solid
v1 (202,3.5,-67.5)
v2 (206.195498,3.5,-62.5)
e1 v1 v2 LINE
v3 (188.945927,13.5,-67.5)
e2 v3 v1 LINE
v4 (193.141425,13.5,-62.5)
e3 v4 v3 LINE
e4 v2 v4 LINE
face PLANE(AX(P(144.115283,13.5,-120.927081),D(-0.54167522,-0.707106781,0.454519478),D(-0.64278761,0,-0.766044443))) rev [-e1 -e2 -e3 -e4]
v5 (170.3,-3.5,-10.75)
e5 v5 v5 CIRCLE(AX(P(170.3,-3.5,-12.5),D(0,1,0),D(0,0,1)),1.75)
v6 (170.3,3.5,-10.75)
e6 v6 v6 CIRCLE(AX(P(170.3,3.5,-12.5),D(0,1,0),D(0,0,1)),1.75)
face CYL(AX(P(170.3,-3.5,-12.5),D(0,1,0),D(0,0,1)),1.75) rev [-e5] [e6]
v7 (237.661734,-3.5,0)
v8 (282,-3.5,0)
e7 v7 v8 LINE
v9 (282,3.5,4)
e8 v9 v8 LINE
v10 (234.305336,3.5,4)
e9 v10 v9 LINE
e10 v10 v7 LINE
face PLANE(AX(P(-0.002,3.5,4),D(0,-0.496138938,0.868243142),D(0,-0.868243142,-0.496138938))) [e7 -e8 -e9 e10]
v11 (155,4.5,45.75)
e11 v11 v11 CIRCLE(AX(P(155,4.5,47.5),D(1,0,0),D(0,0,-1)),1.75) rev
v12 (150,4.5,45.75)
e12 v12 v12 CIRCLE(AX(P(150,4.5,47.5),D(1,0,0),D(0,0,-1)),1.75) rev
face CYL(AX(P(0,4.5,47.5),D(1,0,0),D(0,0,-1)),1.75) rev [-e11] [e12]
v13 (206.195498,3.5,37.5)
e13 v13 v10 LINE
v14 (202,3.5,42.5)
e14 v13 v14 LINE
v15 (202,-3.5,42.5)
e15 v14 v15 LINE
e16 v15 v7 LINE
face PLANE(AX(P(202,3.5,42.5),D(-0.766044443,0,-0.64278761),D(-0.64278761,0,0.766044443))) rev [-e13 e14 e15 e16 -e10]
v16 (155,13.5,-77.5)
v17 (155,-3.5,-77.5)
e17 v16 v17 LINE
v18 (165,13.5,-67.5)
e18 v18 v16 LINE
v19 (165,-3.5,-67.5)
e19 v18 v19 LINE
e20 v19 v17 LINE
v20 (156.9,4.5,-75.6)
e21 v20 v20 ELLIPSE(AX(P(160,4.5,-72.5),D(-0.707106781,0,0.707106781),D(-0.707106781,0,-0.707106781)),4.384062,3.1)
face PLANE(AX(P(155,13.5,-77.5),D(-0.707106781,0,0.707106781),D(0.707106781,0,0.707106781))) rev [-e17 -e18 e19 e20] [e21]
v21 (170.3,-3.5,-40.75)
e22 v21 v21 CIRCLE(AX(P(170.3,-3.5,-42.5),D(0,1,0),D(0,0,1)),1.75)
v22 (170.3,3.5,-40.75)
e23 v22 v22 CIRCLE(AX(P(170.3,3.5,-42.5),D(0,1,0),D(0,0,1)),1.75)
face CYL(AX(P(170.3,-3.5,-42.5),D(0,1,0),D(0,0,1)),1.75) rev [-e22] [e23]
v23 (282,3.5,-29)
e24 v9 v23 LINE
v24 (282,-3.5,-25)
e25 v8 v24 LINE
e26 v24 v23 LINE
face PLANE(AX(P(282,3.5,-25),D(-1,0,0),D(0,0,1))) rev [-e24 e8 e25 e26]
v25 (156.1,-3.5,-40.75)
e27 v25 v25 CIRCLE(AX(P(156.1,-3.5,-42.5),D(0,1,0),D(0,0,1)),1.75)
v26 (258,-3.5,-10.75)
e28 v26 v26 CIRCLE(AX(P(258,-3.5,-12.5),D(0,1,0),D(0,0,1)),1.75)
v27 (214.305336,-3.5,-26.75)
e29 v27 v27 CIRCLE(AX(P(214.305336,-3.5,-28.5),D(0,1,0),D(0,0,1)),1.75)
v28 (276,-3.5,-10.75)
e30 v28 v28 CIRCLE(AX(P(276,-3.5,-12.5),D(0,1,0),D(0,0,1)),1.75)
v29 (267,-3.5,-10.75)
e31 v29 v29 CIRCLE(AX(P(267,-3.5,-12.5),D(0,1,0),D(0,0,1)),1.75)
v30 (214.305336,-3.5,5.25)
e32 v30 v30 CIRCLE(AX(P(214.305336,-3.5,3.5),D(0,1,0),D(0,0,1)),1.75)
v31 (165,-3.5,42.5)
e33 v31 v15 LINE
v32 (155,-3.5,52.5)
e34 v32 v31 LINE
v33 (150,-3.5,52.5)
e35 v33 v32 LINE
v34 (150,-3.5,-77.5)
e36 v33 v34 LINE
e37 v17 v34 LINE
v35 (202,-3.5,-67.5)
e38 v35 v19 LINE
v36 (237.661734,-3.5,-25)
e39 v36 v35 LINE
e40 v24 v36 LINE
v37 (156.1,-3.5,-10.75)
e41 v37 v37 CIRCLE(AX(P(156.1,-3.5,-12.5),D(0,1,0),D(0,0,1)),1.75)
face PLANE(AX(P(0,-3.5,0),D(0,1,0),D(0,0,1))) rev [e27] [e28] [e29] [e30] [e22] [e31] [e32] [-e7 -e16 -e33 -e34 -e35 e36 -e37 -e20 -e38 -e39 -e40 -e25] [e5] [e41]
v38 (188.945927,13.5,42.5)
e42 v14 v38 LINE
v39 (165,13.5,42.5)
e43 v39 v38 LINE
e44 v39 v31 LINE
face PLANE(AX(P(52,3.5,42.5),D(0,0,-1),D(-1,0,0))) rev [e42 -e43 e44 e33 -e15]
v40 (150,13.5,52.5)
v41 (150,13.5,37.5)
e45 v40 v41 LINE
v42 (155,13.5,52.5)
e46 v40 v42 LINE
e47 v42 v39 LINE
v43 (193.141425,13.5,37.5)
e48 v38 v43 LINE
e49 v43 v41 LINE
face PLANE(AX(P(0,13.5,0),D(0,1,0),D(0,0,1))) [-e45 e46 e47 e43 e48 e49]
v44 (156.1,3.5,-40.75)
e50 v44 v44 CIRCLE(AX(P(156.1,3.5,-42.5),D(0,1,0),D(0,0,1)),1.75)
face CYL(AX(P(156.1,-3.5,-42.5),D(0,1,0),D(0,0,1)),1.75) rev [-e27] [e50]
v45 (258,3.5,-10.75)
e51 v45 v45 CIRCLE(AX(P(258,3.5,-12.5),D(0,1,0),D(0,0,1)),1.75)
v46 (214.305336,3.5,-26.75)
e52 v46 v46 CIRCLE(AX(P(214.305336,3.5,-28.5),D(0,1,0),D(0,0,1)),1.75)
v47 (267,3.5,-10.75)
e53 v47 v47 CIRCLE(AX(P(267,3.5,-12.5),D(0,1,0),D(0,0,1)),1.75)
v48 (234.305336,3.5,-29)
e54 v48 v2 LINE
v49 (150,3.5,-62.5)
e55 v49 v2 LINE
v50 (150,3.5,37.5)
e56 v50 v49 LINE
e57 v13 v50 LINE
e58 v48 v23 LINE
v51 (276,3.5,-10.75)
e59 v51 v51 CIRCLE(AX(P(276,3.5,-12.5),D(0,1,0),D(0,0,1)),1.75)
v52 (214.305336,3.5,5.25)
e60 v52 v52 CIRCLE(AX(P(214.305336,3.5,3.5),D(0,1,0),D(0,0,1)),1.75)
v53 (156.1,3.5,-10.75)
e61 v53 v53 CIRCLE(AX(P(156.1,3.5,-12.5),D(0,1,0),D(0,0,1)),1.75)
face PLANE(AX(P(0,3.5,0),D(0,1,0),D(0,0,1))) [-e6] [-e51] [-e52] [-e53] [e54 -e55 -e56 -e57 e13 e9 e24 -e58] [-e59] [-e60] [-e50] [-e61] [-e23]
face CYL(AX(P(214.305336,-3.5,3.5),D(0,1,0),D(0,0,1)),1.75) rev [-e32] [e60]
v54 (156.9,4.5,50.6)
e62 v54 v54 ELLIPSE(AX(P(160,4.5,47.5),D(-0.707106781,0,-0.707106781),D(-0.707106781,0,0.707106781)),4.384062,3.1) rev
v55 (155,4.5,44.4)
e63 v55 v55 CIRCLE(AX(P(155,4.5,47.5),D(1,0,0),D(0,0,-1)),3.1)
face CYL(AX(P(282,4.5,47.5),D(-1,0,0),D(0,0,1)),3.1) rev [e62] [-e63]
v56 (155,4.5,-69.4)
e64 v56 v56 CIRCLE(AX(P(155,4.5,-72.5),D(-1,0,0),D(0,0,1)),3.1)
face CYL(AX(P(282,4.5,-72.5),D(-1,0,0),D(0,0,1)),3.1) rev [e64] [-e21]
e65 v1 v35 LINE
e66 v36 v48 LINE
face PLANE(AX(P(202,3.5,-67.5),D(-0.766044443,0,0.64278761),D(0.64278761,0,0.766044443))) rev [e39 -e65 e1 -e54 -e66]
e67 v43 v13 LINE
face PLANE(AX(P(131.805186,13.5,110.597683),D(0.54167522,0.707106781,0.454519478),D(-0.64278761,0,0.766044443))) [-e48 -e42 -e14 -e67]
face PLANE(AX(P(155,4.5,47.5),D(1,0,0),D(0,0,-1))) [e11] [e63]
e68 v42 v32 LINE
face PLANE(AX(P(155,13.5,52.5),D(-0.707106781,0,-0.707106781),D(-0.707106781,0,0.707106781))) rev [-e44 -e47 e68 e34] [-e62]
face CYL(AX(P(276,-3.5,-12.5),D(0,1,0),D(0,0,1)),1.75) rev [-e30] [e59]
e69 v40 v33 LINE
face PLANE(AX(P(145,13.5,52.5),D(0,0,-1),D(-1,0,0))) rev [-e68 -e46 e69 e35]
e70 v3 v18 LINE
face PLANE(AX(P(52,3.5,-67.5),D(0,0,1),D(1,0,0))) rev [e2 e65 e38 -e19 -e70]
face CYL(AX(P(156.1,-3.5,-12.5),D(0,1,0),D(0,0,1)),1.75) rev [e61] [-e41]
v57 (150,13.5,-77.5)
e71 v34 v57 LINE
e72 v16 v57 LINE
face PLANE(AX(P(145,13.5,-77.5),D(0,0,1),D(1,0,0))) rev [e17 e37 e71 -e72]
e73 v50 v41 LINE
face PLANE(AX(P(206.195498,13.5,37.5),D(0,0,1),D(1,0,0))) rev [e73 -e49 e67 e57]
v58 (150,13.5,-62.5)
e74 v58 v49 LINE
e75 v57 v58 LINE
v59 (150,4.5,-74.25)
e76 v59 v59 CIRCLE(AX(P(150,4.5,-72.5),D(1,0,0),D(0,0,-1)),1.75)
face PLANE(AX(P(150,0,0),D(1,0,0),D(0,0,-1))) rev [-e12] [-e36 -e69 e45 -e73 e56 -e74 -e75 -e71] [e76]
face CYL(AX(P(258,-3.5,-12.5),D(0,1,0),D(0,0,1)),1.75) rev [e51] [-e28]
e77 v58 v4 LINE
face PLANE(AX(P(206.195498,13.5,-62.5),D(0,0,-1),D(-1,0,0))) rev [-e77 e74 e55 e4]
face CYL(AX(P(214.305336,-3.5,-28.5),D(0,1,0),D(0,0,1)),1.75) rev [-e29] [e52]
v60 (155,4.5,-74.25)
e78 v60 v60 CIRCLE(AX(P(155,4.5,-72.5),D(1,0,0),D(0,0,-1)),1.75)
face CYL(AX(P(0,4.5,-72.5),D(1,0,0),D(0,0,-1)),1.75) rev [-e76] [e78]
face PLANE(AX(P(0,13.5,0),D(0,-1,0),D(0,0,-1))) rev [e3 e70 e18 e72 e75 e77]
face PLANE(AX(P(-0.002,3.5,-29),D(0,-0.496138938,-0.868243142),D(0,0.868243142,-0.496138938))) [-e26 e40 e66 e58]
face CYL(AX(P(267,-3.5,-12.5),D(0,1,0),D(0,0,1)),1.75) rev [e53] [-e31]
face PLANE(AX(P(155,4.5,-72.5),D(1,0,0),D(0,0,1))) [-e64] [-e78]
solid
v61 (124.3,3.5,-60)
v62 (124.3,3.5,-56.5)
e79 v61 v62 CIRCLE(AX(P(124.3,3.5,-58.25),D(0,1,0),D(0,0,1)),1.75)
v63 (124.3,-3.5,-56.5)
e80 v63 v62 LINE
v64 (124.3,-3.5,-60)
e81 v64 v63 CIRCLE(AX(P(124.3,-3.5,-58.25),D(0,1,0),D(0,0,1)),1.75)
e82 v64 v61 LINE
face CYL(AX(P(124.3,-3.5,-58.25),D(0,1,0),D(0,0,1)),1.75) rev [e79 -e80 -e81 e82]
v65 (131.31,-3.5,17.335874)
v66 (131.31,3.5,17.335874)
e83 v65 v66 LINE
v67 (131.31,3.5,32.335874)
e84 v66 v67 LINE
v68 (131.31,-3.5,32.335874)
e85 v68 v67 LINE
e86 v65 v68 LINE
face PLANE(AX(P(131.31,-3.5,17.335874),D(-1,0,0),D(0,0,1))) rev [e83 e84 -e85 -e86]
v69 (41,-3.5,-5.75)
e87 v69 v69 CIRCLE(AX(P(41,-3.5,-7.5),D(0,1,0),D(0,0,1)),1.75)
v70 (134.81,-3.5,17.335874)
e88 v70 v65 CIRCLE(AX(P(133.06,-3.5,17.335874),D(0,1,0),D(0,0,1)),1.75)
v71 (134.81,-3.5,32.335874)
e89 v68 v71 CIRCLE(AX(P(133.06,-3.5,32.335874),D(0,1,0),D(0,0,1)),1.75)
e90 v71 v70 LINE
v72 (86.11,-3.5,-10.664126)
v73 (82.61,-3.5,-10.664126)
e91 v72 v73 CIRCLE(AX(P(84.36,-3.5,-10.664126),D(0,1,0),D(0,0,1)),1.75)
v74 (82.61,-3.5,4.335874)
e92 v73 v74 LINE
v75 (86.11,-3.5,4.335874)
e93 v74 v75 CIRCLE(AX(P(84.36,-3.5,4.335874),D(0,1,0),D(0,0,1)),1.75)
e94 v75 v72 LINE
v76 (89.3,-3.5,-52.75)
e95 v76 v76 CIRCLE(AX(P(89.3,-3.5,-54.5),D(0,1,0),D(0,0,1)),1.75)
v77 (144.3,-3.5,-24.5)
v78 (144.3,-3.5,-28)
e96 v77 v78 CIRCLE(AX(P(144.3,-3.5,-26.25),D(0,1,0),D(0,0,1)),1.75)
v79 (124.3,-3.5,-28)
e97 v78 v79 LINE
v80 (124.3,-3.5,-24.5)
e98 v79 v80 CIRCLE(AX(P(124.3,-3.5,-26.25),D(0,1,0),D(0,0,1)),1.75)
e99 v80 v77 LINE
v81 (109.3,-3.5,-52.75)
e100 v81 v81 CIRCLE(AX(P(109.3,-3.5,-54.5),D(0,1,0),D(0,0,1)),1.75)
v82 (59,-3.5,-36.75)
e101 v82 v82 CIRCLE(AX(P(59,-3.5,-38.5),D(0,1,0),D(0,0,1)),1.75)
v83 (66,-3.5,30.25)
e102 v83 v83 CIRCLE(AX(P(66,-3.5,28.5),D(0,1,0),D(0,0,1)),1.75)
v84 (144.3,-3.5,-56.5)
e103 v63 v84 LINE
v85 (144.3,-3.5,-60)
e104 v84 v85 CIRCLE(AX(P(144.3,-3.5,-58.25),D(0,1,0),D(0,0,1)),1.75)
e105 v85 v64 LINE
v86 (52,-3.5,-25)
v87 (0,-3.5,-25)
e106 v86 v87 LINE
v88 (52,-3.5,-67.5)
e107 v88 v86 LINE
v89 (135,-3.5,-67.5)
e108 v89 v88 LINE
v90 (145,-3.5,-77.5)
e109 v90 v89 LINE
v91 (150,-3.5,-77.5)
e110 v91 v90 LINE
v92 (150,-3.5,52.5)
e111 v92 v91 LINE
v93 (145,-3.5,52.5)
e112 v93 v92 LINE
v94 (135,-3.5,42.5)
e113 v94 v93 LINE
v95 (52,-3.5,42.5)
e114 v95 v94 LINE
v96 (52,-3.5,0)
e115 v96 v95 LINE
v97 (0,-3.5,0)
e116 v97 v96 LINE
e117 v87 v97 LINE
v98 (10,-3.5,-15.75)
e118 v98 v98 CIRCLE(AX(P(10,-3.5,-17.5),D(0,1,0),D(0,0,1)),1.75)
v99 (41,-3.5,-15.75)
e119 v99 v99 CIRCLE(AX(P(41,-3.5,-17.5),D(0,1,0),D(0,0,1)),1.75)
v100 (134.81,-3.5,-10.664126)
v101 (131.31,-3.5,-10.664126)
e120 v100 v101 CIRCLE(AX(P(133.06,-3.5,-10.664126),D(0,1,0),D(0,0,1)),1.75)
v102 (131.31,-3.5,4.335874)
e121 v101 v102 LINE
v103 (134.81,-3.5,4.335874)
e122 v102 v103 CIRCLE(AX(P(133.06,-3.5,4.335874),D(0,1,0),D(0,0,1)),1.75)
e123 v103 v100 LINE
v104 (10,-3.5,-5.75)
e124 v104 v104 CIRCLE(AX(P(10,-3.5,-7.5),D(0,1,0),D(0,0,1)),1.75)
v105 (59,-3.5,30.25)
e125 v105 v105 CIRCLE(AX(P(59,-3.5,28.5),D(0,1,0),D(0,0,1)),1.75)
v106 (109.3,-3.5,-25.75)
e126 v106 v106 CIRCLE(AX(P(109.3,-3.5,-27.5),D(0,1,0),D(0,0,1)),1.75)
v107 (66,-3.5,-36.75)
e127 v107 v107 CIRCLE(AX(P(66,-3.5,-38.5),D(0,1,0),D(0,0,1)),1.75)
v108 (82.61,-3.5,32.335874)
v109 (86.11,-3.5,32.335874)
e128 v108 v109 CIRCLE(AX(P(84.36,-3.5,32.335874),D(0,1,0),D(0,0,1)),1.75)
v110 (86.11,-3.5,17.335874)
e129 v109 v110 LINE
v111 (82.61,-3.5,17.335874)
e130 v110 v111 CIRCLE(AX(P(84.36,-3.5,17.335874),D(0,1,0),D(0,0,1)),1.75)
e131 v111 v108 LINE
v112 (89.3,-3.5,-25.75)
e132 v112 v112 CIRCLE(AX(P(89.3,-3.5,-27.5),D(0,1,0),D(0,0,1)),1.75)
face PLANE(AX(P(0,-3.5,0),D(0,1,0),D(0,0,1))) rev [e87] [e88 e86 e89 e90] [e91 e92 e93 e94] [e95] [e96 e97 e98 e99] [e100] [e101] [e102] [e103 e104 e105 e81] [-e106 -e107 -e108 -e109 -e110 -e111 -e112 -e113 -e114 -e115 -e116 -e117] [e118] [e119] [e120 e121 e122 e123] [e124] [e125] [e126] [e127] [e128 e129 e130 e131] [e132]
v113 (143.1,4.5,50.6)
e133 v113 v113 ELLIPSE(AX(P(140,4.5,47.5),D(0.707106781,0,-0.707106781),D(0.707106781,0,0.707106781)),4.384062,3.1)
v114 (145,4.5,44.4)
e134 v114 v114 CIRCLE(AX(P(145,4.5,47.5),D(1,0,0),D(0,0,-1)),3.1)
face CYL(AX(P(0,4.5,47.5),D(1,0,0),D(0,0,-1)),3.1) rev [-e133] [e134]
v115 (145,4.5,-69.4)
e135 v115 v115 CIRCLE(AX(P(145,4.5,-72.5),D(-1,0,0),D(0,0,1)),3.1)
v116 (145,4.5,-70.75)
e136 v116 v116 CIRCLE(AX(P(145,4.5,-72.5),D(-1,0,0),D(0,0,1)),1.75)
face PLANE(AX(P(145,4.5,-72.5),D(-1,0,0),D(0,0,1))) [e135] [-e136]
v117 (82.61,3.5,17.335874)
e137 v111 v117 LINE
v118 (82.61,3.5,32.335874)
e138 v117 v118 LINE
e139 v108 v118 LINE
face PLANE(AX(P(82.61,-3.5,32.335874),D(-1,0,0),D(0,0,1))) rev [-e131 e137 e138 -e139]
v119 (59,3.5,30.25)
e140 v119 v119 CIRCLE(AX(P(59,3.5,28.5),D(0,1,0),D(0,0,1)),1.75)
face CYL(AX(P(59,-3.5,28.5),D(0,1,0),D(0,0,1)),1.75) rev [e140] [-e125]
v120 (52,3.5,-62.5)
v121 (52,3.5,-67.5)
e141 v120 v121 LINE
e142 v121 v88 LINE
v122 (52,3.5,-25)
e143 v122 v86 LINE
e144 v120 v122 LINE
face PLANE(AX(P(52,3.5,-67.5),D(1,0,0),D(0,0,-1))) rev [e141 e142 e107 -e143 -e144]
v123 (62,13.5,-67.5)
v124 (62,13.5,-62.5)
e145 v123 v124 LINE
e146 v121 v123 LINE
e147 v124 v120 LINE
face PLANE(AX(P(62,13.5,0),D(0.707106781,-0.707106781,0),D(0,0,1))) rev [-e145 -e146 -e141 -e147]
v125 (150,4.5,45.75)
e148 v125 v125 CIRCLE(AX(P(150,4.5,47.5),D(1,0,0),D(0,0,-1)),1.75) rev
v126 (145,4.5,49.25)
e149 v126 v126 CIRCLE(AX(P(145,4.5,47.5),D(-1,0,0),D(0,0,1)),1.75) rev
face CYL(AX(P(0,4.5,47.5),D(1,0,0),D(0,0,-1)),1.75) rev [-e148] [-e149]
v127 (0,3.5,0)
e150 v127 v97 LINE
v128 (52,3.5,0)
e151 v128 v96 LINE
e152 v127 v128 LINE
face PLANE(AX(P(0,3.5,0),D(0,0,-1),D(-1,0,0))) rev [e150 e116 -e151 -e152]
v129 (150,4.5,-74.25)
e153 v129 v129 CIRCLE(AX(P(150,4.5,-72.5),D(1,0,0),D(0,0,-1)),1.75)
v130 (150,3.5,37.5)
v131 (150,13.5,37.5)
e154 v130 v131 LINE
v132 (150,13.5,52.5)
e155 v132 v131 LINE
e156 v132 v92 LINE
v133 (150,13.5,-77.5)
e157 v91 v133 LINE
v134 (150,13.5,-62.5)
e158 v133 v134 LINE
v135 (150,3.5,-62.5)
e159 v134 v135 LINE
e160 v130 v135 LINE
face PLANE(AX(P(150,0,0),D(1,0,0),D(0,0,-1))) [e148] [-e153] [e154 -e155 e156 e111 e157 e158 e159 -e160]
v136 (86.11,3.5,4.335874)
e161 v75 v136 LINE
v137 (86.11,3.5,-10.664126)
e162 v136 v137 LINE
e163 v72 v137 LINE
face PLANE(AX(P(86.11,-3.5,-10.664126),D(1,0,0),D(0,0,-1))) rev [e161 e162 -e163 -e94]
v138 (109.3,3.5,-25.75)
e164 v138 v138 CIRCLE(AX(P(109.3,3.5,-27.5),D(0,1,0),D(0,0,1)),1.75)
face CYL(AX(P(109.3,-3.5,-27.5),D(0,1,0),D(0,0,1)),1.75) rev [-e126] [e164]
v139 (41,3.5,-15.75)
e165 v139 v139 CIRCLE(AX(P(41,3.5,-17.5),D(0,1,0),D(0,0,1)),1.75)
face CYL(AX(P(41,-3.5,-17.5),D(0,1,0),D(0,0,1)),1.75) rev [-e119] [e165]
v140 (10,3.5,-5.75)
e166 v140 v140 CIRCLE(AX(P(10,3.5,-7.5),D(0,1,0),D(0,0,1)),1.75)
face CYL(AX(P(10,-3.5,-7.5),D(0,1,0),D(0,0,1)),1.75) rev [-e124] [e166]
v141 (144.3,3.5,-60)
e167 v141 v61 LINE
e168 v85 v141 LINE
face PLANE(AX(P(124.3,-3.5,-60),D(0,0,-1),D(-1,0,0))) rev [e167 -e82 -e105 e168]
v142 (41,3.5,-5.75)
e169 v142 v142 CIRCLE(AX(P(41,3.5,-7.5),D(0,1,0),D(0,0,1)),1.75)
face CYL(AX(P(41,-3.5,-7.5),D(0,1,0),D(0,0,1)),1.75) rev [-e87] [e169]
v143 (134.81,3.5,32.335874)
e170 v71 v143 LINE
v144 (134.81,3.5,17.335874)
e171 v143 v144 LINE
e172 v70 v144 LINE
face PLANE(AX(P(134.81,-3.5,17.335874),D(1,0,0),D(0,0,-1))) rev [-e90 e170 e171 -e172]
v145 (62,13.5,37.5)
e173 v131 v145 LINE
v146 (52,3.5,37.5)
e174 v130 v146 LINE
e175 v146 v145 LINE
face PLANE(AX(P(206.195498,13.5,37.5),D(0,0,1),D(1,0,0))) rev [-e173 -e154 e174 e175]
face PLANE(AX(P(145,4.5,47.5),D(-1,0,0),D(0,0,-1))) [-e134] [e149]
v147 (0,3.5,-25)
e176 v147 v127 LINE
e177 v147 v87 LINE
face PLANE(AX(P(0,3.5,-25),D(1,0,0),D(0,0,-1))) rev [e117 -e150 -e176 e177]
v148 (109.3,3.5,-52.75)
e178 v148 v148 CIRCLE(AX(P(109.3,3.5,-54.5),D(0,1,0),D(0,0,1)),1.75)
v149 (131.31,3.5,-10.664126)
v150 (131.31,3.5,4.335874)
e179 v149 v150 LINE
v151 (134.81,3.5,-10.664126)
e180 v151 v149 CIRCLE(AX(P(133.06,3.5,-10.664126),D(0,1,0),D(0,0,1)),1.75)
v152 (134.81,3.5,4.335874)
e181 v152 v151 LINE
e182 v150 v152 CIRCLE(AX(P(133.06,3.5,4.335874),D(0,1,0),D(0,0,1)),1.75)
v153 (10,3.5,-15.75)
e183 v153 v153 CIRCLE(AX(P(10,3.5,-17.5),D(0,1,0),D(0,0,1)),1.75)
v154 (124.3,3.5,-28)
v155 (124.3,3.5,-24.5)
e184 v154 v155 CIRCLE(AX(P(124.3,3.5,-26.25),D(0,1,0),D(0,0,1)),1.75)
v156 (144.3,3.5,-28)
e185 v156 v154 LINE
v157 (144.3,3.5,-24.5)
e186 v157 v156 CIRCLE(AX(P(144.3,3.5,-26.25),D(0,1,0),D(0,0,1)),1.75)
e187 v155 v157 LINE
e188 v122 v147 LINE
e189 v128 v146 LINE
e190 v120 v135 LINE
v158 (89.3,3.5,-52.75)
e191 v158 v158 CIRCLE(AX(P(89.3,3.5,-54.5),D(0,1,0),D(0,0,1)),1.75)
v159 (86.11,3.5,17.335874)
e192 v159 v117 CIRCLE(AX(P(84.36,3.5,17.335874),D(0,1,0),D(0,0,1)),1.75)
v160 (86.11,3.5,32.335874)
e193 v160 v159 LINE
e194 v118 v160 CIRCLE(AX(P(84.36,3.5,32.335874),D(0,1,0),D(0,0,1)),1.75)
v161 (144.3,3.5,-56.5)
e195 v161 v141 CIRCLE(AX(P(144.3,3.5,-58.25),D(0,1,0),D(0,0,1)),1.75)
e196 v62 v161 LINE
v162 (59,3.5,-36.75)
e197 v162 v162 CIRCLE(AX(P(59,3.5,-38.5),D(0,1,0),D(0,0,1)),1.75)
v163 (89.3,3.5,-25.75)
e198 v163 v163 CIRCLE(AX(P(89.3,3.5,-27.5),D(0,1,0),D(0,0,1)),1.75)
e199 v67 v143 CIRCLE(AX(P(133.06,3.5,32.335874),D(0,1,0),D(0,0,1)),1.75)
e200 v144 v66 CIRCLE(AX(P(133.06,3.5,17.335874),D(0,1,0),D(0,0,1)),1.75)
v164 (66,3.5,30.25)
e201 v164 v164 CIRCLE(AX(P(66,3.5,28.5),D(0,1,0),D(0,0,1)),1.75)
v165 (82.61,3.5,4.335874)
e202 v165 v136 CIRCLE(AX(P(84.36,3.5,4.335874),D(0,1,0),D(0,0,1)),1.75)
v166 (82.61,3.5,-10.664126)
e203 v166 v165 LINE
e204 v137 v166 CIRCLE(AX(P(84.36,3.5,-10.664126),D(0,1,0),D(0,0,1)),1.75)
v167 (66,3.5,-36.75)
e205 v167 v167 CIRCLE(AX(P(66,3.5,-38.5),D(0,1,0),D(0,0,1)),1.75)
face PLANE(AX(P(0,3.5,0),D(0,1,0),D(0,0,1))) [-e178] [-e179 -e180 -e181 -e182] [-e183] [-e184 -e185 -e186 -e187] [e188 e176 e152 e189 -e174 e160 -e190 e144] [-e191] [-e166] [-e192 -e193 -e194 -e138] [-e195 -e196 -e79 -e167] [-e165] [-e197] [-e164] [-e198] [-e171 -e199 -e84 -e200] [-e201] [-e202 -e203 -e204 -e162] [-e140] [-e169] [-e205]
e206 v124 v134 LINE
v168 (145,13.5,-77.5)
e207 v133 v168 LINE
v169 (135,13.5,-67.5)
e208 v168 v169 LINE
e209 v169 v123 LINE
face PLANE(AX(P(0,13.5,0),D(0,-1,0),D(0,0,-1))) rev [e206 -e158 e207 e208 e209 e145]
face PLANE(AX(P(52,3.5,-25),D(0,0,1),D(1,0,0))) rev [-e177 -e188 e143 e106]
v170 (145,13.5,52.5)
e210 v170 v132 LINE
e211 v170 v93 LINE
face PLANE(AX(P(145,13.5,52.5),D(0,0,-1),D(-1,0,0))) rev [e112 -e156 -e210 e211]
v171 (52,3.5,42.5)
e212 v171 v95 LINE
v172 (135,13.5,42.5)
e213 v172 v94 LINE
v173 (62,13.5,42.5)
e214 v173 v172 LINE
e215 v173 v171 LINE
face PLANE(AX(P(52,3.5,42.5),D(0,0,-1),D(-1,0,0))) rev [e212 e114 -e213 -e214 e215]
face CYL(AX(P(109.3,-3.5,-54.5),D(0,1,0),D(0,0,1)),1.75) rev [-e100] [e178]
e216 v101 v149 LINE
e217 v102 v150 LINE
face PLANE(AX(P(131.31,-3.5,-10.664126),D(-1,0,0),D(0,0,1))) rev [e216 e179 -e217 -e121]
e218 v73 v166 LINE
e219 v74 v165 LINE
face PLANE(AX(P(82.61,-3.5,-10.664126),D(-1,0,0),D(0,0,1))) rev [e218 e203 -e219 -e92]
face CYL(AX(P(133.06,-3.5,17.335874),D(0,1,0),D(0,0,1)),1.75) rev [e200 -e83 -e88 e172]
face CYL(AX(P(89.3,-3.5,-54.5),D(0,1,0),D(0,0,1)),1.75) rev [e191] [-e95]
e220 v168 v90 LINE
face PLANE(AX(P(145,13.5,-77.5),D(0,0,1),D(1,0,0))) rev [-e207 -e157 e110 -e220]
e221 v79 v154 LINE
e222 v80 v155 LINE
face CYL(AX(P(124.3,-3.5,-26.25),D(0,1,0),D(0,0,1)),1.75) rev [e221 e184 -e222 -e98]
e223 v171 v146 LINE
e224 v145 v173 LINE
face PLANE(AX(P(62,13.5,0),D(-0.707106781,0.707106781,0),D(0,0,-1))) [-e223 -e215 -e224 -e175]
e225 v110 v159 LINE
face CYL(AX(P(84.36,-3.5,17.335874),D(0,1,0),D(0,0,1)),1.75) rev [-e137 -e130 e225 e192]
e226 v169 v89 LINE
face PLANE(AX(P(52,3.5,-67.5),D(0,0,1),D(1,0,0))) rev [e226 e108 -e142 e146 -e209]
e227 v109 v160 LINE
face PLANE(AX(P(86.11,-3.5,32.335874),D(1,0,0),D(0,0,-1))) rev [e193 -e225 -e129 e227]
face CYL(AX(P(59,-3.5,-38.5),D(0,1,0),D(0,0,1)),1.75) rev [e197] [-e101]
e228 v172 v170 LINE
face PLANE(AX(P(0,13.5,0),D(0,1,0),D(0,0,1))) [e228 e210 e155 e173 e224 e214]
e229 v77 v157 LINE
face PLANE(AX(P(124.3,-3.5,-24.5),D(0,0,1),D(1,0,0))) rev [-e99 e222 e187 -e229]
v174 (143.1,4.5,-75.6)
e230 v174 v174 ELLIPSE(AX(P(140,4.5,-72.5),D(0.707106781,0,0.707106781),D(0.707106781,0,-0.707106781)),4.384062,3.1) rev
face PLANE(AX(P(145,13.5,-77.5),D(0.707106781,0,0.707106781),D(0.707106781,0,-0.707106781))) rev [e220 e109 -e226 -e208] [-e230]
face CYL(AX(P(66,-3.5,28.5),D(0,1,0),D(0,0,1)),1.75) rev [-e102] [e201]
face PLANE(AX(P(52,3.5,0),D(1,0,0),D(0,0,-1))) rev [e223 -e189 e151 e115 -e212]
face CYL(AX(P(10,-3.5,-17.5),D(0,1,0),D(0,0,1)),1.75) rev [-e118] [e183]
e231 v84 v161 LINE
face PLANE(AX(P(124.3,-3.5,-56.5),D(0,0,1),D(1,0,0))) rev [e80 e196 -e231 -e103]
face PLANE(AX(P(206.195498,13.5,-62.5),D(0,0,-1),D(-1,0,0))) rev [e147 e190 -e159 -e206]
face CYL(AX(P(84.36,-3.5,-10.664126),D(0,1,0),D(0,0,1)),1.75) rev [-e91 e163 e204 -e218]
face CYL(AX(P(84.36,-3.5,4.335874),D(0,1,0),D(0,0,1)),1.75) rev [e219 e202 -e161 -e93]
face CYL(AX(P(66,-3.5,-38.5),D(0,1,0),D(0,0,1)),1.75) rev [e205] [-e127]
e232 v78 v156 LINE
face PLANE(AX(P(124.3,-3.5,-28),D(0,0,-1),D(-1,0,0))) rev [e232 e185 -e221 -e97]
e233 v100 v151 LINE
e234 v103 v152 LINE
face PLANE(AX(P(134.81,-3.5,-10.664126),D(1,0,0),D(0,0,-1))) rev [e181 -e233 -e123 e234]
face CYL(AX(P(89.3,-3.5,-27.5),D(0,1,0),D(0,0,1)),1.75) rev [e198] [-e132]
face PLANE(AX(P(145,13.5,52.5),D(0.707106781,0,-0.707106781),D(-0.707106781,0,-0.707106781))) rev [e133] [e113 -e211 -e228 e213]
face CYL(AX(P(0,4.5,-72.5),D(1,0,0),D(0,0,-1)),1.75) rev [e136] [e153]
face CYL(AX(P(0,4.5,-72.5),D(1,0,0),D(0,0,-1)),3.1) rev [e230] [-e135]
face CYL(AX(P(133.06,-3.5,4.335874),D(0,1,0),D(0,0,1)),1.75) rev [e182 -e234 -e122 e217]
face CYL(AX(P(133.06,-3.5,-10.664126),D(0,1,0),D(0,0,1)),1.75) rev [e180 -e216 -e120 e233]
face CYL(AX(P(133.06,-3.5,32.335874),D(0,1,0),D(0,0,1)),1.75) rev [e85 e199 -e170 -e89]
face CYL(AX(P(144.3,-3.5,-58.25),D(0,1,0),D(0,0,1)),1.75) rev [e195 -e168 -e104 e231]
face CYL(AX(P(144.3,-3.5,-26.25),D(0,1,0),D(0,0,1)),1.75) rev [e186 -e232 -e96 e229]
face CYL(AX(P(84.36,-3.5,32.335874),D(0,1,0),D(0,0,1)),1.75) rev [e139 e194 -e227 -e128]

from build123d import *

# Parameters (mm, degrees)
SALIENTE_EXTRUIR1_DEPTH   = 3.5
SALIENTE_EXTRUIR2_DEPTH   = 10
SALIENTE_EXTRUIR3_DEPTH   = 17
SALIENTE_EXTRUIR4_REACH   = 294.767
CROQUIS7_R                = 1.75
CORTAR_EXTRUIR5_DEPTH     = 293.626468386
CHAFL_N1_SIZE             = 10
CROQUIS12_R               = 1.75
CORTAR_EXTRUIR8_DEPTH     = 170.376798883
CROQUIS14_R               = 3.1
CORTAR_EXTRUIR9_DEPTH     = 174.820309515
SIMETR_A3_COPY_1_SKETCH_R = 3.1
SIMETR_A3_COPY_1_DEPTH    = 174.820309515
CORTAR_EXTRUIR10_DEPTH    = 293.626468386
CORTAR_EXTRUIR11_DEPTH    = 293.626468386
CROQUIS18_R               = 1.75
CORTAR_EXTRUIR12_DEPTH    = 293.626468386


with BuildPart() as part:
    # Croquis1 → Saliente-Extruir1 (new, symmetric)
    with BuildSketch(Plane(origin=(0, 0, 0), x_dir=(1, 0, 0), z_dir=(0, 1, 0))):
        Polygon((282, 25), (282, 0), (237.661734325, 0), (202, -42.5), (52, -42.5), (52, 0), (0, 0), (0, 25), (52, 25), (52, 67.5), (202, 67.5), (237.661734325, 25), align=None)
    extrude(amount=SALIENTE_EXTRUIR1_DEPTH, both=True)

    # Croquis6 → Saliente-Extruir2 (add)
    with BuildSketch(Plane(origin=(0, 3.5, 0), x_dir=(1, 0, 0), z_dir=(0, 1, 0))):
        Polygon((52, 67.5), (202, 67.5), (206.195498156, 62.5), (52, 62.5), align=None)
        Polygon((52, -37.5), (52, -42.5), (202, -42.5), (206.195498156, -37.5), align=None)
    extrude(amount=SALIENTE_EXTRUIR2_DEPTH)

    # Croquis9 → Saliente-Extruir3 (add)
    with BuildSketch(Plane(origin=(0, -3.5, 0), x_dir=(1, 0, 0), z_dir=(0, 1, 0))):
        Polygon((145, -52.5), (135, -42.5), (165, -42.5), (155, -52.5), align=None)
        Polygon((135, 67.5), (165, 67.5), (155, 77.5), (145, 77.5), align=None)
    extrude(amount=SALIENTE_EXTRUIR3_DEPTH)

    # Croquis15 → Saliente-Extruir4 (add, up to next)
    with BuildSketch(Plane(origin=(282, 0, 0), x_dir=(0, 0, -1), z_dir=(1, 0, 0)), mode=Mode.PRIVATE) as saliente_extruir4_sk1:
        Polygon((0, -3.5), (0, 3.5), (-4, 3.5), align=None)
    saliente_extruir4_tool1 = extrude(saliente_extruir4_sk1.sketch, amount=-SALIENTE_EXTRUIR4_REACH, mode=Mode.PRIVATE) - part.part
    # Croquis15 → Saliente-Extruir4 (add, up to next)
    with BuildSketch(Plane(origin=(282, 0, 0), x_dir=(0, 0, -1), z_dir=(1, 0, 0)), mode=Mode.PRIVATE) as saliente_extruir4_sk2:
        Polygon((25, -3.5), (25, 3.5), (29, 3.5), align=None)
    saliente_extruir4_tool2 = extrude(saliente_extruir4_sk2.sketch, amount=-SALIENTE_EXTRUIR4_REACH, mode=Mode.PRIVATE) - part.part
    add(saliente_extruir4_tool1.solids().sort_by_distance((282, 1.166667, 1.333333))[0])
    add(saliente_extruir4_tool2.solids().sort_by_distance((282, 1.166667, -26.333333))[0])

    # Croquis7 → Cortar-Extruir5 (cut, through all)
    with BuildSketch(Plane(origin=(0, 3.5, 0), x_dir=(1, 0, 0), z_dir=(0, 1, 0))):
        with Locations(Location((214.3053358, 28.5, 0), (0, 0, 270))):
            Circle(CROQUIS7_R)
        with Locations(Location((214.3053358, -3.5, 0), (0, 0, 270))):
            Circle(CROQUIS7_R)
    extrude(amount=-CORTAR_EXTRUIR5_DEPTH, mode=Mode.SUBTRACT)

    # Chaflán1
    # the kernel refuses this chamfer: 10 mm, written as the material it takes off along each edge
    with BuildSketch(Plane(origin=(52, 13.5, 11.78317012), x_dir=(-0.027495876610586317, -0.9996219169112968, 0), z_dir=(0, 0, 1))) as chafl_n1_piece_1:
        Polygon((CHAFL_N1_SIZE * 0.999621916911, CHAFL_N1_SIZE * 0.0274958766106), (-CHAFL_N1_SIZE * 0.0274958766106, CHAFL_N1_SIZE * 0.999621916911), (0, 0), align=None)
    extrude(amount=56.433659759, mode=Mode.SUBTRACT)
    with BuildSketch(Plane(origin=(52, 13.5, -36.78317012), x_dir=(-0.027495876610586317, -0.9996219169112968, 0), z_dir=(0, 0, -1))) as chafl_n1_piece_2:
        Polygon((CHAFL_N1_SIZE * 0.999621916911, -CHAFL_N1_SIZE * 0.0274958766106), (-CHAFL_N1_SIZE * 0.0274958766106, -CHAFL_N1_SIZE * 0.999621916911), (0, 0), align=None)
    extrude(amount=56.433659759, mode=Mode.SUBTRACT)
    with BuildSketch(Plane(origin=(185.469540393, 13.5, -87.200234624), x_dir=(0.021063063486225234, -0.9996219169112968, -0.017674008802755378), z_dir=(0.6427876096865426, 0, 0.7660444431189753))) as chafl_n1_piece_3:
        Polygon((CHAFL_N1_SIZE * 0.999621916911, -CHAFL_N1_SIZE * 0.0274958766106), (-CHAFL_N1_SIZE * 0.0274958766106, -CHAFL_N1_SIZE * 0.999621916911), (0, 0), align=None)
    extrude(amount=57.960696206, mode=Mode.SUBTRACT)
    with BuildSketch(Plane(origin=(185.469540393, 13.5, 62.200234624), x_dir=(0.021063063486226254, -0.9996219169112968, 0.017674008802756234), z_dir=(0.6427876096865426, 0, -0.7660444431189753))) as chafl_n1_piece_4:
        Polygon((CHAFL_N1_SIZE * 0.999621916911, CHAFL_N1_SIZE * 0.0274958766106), (-CHAFL_N1_SIZE * 0.0274958766106, CHAFL_N1_SIZE * 0.999621916911), (0, 0), align=None)
    extrude(amount=57.960696206, mode=Mode.SUBTRACT)

    # Croquis12 → Cortar-Extruir8 (cut, symmetric)
    with BuildSketch(Plane(origin=(150, 0, 0), x_dir=(0, 0, -1), z_dir=(1, 0, 0))):
        with Locations((-47.5, 4.5)):
            Circle(CROQUIS12_R)
    cortar_extruir8 = extrude(amount=CORTAR_EXTRUIR8_DEPTH, both=True, mode=Mode.SUBTRACT)

    # Croquis14 → Cortar-Extruir9 (cut, through all)
    with BuildSketch(Plane(origin=(155, 0, 0), x_dir=(0, 0, -1), z_dir=(1, 0, 0))):
        with Locations(Location((-47.5, 4.5, 0), (0, 0, 180))):
            Circle(CROQUIS14_R)
    cortar_extruir9 = extrude(amount=CORTAR_EXTRUIR9_DEPTH, mode=Mode.SUBTRACT)

    # Simetría2: Cortar-Extruir9 across plane
    add(cortar_extruir9.mirror(Plane(origin=(150, 0, 0), x_dir=(0, 0, 1), z_dir=(1, 0, 0))), mode=Mode.SUBTRACT)

    # Simetría3: Cortar-Extruir8, Cortar-Extruir9 across plane
    add(cortar_extruir8.mirror(Plane.XY.offset(-12.5)), mode=Mode.SUBTRACT)
    add(cortar_extruir9.mirror(Plane.XY.offset(-12.5)), mode=Mode.SUBTRACT)

    # Simetría3 copy 1 sketch → Simetría3 copy 1 (cut, through all)
    with BuildSketch(Plane(origin=(145, 0, -25), x_dir=(0, 0, 1), z_dir=(-1, 0, 0))):
        with Locations(Location((-47.5, 4.5, 0), (0, 0, 180))):
            Circle(SIMETR_A3_COPY_1_SKETCH_R)
    extrude(amount=SIMETR_A3_COPY_1_DEPTH, mode=Mode.SUBTRACT)

    # Croquis16 → Cortar-Extruir10 (cut, through all)
    with BuildSketch(Plane(origin=(0, 3.5, 0), x_dir=(1, 0, 0), z_dir=(0, 1, 0))):
        with BuildLine():
            Line((82.61, -32.335873866), (82.61, -17.335873866))
            ThreePointArc((82.61, -17.335873866), (84.36, -15.585873866), (86.11, -17.335873866))
            Line((86.11, -17.335873866), (86.11, -32.335873866))
            ThreePointArc((86.11, -32.335873866), (84.36, -34.085873866), (82.61, -32.335873866))
        make_face()
        with BuildLine():
            Line((86.11, 10.664126134), (86.11, -4.335873866))
            ThreePointArc((86.11, -4.335873866), (84.36, -6.085873866), (82.61, -4.335873866))
            Line((82.61, -4.335873866), (82.61, 10.664126134))
            ThreePointArc((82.61, 10.664126134), (84.36, 12.414126134), (86.11, 10.664126134))
        make_face()
        with BuildLine():
            Line((134.81, 10.664126134), (134.81, -4.335873866))
            ThreePointArc((134.81, -4.335873866), (133.06, -6.085873866), (131.31, -4.335873866))
            Line((131.31, -4.335873866), (131.31, 10.664126134))
            ThreePointArc((131.31, 10.664126134), (133.06, 12.414126134), (134.81, 10.664126134))
        make_face()
        with BuildLine():
            Line((134.81, -17.335873866), (134.81, -32.335873866))
            ThreePointArc((134.81, -32.335873866), (133.06, -34.085873866), (131.31, -32.335873866))
            Line((131.31, -32.335873866), (131.31, -17.335873866))
            ThreePointArc((131.31, -17.335873866), (133.06, -15.585873866), (134.81, -17.335873866))
        make_face()
    extrude(amount=-CORTAR_EXTRUIR10_DEPTH, mode=Mode.SUBTRACT)

    # Croquis17 → Cortar-Extruir11 (cut, through all)
    with BuildSketch(Plane(origin=(0, 3.5, 0), x_dir=(1, 0, 0), z_dir=(0, 1, 0))):
        with BuildLine():
            Line((124.3, 60), (144.3, 60))
            ThreePointArc((144.3, 60), (146.05, 58.25), (144.3, 56.5))
            Line((144.3, 56.5), (124.3, 56.5))
            ThreePointArc((124.3, 56.5), (122.55, 58.25), (124.3, 60))
        make_face()
        with BuildLine():
            Line((124.3, 28), (144.3, 28))
            ThreePointArc((144.3, 28), (146.05, 26.25), (144.3, 24.5))
            Line((144.3, 24.5), (124.3, 24.5))
            ThreePointArc((124.3, 24.5), (122.55, 26.25), (124.3, 28))
        make_face()
    extrude(amount=-CORTAR_EXTRUIR11_DEPTH, mode=Mode.SUBTRACT)

    # Croquis18 → Cortar-Extruir12 (cut, through all)
    with BuildSketch(Plane(origin=(0, 3.5, 0), x_dir=(1, 0, 0), z_dir=(0, 1, 0))):
        with Locations(Location((10, 17.5, 0), (0, 0, 270))):
            Circle(CROQUIS18_R)
        with Locations(Location((10, 7.5, 0), (0, 0, 270))):
            Circle(CROQUIS18_R)
        with Locations(Location((41, 17.5, 0), (0, 0, 270))):
            Circle(CROQUIS18_R)
        with Locations(Location((41, 7.5, 0), (0, 0, 270))):
            Circle(CROQUIS18_R)
        with Locations(Location((59, 38.5, 0), (0, 0, 270))):
            Circle(CROQUIS18_R)
        with Locations(Location((66, 38.5, 0), (0, 0, 270))):
            Circle(CROQUIS18_R)
        with Locations(Location((66, -28.5, 0), (0, 0, 270))):
            Circle(CROQUIS18_R)
        with Locations(Location((59, -28.5, 0), (0, 0, 270))):
            Circle(CROQUIS18_R)
        with Locations(Location((89.3, 27.5, 0), (0, 0, 270))):
            Circle(CROQUIS18_R)
        with Locations(Location((109.3, 27.5, 0), (0, 0, 270))):
            Circle(CROQUIS18_R)
        with Locations(Location((109.3, 54.5, 0), (0, 0, 270))):
            Circle(CROQUIS18_R)
        with Locations(Location((89.3, 54.5, 0), (0, 0, 270))):
            Circle(CROQUIS18_R)
        with Locations(Location((156.1, 42.5, 0), (0, 0, 270))):
            Circle(CROQUIS18_R)
        with Locations(Location((170.3, 42.5, 0), (0, 0, 270))):
            Circle(CROQUIS18_R)
        with Locations(Location((156.1, 12.5, 0), (0, 0, 270))):
            Circle(CROQUIS18_R)
        with Locations(Location((170.3, 12.5, 0), (0, 0, 270))):
            Circle(CROQUIS18_R)
        with Locations(Location((214.3053358, 28.5, 0), (0, 0, 270))):
            Circle(CROQUIS18_R)
        with Locations(Location((214.3053358, -3.5, 0), (0, 0, 270))):
            Circle(CROQUIS18_R)
        with Locations(Location((258, 12.5, 0), (0, 0, 270))):
            Circle(CROQUIS18_R)
        with Locations(Location((267, 12.5, 0), (0, 0, 270))):
            Circle(CROQUIS18_R)
        with Locations(Location((276, 12.5, 0), (0, 0, 270))):
            Circle(CROQUIS18_R)
    extrude(amount=-CORTAR_EXTRUIR12_DEPTH, mode=Mode.SUBTRACT)


with BuildPart() as body_2:
    # Partir1: the piece on the far side of the plane
    add(part.part)
    split(bisect_by=Plane(origin=(150, 0, 0), x_dir=(0, 0, 1), z_dir=(1, 0, 0)), keep=Keep.BOTTOM)


with BuildPart() as part_1:
    add(part.part)

    # Partir1
    split(bisect_by=Plane(origin=(150, 0, 0), x_dir=(0, 0, 1), z_dir=(1, 0, 0)), keep=Keep.TOP)


solid = Compound([body_2.part, part_1.part])
